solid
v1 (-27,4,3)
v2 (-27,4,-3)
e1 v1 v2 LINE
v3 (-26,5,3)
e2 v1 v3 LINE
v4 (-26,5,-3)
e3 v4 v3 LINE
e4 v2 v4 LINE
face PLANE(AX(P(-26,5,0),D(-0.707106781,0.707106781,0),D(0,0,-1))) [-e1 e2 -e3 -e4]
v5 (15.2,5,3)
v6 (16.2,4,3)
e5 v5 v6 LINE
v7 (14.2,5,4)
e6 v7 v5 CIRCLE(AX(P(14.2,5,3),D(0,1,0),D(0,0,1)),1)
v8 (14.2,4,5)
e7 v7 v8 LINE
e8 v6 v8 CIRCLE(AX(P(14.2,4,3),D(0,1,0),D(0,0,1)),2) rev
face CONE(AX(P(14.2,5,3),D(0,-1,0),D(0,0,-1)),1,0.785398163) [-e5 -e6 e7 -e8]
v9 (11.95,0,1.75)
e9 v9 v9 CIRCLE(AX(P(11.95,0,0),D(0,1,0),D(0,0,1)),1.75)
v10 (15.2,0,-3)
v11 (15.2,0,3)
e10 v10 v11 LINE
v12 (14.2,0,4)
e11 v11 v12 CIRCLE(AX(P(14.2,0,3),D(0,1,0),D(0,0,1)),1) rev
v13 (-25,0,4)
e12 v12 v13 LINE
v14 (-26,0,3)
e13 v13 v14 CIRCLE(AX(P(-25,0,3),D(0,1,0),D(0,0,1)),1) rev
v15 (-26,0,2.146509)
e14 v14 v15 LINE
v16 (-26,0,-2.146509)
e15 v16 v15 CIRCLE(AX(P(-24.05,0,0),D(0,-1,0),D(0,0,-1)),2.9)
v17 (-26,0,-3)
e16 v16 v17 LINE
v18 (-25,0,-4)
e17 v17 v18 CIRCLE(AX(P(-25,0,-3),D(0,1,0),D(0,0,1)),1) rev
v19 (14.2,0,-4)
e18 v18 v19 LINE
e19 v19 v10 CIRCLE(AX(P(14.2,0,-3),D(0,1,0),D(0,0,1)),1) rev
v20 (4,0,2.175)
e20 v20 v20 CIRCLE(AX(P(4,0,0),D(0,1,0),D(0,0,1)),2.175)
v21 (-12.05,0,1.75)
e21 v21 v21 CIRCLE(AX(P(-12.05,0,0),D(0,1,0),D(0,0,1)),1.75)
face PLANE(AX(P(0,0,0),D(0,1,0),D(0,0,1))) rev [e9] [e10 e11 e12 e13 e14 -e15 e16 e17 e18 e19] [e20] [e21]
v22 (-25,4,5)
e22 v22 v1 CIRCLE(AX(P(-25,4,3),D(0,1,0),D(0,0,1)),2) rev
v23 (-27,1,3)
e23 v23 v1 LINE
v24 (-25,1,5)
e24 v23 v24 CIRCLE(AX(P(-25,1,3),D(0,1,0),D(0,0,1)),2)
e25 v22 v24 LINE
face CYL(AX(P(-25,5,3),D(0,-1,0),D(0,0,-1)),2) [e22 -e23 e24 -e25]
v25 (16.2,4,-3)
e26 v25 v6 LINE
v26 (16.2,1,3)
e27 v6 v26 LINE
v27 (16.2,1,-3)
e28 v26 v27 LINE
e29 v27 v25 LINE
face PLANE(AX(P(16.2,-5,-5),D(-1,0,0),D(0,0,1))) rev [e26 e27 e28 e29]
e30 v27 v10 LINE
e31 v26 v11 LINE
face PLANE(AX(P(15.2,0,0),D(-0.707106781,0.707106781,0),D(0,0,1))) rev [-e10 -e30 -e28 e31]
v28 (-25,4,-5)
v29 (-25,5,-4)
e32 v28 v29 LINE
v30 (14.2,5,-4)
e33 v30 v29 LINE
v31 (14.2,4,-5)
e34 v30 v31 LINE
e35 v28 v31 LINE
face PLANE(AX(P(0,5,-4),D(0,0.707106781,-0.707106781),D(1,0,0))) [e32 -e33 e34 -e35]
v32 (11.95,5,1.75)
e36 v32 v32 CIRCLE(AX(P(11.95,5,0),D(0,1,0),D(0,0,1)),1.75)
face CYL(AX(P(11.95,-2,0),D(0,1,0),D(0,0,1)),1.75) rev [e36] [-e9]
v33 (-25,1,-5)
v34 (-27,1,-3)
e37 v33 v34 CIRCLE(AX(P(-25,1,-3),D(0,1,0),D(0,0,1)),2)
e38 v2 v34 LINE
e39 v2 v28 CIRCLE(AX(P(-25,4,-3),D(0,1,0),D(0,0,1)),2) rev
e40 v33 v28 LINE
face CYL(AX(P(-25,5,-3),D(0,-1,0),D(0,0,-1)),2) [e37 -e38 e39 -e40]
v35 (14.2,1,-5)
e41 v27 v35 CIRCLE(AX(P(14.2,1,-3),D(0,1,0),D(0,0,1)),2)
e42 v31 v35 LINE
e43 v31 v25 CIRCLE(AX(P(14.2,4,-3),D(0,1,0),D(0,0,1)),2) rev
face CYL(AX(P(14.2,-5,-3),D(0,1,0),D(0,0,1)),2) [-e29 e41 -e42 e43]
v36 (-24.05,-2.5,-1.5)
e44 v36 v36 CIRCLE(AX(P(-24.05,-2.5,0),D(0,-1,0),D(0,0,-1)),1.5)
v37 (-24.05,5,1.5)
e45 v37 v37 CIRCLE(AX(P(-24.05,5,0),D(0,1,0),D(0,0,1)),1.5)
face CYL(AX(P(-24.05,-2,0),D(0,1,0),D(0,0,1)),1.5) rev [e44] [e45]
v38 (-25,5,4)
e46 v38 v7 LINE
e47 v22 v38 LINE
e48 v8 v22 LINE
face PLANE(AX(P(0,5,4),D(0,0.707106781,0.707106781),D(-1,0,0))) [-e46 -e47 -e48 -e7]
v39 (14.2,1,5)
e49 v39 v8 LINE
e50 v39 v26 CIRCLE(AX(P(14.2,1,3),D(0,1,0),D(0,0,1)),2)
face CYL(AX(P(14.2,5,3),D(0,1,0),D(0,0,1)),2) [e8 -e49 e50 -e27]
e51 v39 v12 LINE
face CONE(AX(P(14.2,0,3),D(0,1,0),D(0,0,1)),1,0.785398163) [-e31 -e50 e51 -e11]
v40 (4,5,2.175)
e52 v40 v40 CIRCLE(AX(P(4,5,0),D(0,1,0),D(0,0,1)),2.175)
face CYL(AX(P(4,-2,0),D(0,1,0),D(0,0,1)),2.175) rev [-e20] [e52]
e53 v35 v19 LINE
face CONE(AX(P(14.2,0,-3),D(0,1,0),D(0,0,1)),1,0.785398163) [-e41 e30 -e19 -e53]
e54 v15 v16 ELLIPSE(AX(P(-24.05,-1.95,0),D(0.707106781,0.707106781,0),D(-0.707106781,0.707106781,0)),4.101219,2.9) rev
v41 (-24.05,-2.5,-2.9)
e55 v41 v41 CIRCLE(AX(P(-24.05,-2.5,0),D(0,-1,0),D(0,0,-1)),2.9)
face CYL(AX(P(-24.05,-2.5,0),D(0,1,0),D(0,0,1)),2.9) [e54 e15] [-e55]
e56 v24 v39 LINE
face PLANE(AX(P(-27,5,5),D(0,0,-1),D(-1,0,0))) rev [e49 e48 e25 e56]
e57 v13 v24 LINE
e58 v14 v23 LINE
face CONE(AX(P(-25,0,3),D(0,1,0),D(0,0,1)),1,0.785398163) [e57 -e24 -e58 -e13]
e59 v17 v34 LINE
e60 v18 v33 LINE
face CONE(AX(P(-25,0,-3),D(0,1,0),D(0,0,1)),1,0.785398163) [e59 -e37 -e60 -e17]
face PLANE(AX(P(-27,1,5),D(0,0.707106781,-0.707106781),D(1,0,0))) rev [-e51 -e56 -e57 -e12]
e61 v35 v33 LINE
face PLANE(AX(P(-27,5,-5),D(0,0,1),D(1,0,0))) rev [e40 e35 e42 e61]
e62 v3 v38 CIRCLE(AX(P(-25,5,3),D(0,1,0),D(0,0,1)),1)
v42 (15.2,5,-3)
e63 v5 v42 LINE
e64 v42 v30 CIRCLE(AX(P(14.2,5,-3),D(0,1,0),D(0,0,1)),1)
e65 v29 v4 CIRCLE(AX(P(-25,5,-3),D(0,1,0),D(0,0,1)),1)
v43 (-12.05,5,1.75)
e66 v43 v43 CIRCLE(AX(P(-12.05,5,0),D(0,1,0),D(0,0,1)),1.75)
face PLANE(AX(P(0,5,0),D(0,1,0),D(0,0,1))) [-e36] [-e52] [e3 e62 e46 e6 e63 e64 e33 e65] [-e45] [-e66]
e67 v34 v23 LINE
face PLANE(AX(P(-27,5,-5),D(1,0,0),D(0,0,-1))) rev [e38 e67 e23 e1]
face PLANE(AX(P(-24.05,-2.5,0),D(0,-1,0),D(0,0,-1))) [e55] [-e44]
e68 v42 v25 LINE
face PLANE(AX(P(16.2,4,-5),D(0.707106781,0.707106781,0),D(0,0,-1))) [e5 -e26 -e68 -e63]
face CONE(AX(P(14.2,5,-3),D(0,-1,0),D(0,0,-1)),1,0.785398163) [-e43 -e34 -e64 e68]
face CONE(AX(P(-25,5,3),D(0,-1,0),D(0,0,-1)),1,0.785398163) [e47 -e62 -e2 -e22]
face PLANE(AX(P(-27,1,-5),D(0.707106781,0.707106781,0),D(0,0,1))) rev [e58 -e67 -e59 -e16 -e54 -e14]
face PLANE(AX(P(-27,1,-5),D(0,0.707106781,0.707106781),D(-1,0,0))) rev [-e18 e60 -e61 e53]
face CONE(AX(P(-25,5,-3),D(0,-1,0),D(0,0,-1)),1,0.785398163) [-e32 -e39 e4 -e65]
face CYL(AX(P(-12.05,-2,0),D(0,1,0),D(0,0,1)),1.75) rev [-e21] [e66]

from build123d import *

# Parameters (mm, degrees)
SKETCH1_W           = 54
SKETCH1_H           = 10
BOSS_EXTRUDE1_DEPTH = 5
SKETCH3_R           = 1.5
SKETCH3_R_2         = 2.175
SKETCH3_R_3         = 1.75
CUT_EXTRUDE1_DEPTH  = 7
FILLET1_R           = 2
SKETCH4_R           = 2.9
SKETCH4_R_2         = 1.5
BOSS_EXTRUDE2_DEPTH = 2.5
SKETCH5_W           = 14.628032649
SKETCH5_H           = 11.072623212
CUT_EXTRUDE2_DEPTH  = 10
FILLET2_R           = 2
CHAMFER1_SIZE       = 1


with BuildPart() as part:
    # Sketch1 → Boss-Extrude1 (new body)
    with BuildSketch(Plane(origin=(0, 0, 0), x_dir=(1, 0, 0), z_dir=(0, 1, 0))):
        Rectangle(SKETCH1_W, SKETCH1_H)
    extrude(amount=BOSS_EXTRUDE1_DEPTH)

    # Sketch3 → Cut-Extrude1 (cut)
    with BuildSketch(Plane(origin=(0, 5, 0), x_dir=(1, 0, 0), z_dir=(0, 1, 0))):
        with Locations(Location((-24.05, 0, 0), (0, 0, 270))):
            Circle(SKETCH3_R)
        with Locations(Location((4, 0, 0), (0, 0, 270))):
            Circle(SKETCH3_R_2)
        with Locations(Location((-12.05, 0, 0), (0, 0, 270))):
            Circle(SKETCH3_R_3)
        with Locations(Location((11.95, 0, 0), (0, 0, 270))):
            Circle(SKETCH3_R_3)
    extrude(amount=-CUT_EXTRUDE1_DEPTH, mode=Mode.SUBTRACT)

    # Fillet1
    fillet1_edges = [part.edges().sort_by_distance(p)[0] for p in [
        (27, 2.5, 5),
        (-27, 2.5, 5),
        (-27, 2.5, -5),
        (27, 2.5, -5),
    ]]
    fillet(fillet1_edges, radius=FILLET1_R)

    # Sketch4 → Boss-Extrude2 (add)
    with BuildSketch(Plane.XZ):
        with Locations(Location((-24.05, 0, 0), (0, 0, 270))):
            Circle(SKETCH4_R)
        with Locations(Location((-24.05, 0, 0), (0, 0, 90))):
            Circle(SKETCH4_R_2, mode=Mode.SUBTRACT)
    extrude(amount=BOSS_EXTRUDE2_DEPTH)

    # Sketch5 → Cut-Extrude2 (cut)
    with BuildSketch(Plane(origin=(0, 5, 0), x_dir=(1, 0, 0), z_dir=(0, 1, 0))):
        with Locations((23.514016324, -0.536311606)):
            Rectangle(SKETCH5_W, SKETCH5_H)
    extrude(amount=-CUT_EXTRUDE2_DEPTH, mode=Mode.SUBTRACT)

    # Fillet2
    fillet2_edges = [part.edges().sort_by_distance(p)[0] for p in [
        (16.2, 2.5, 5),
        (16.2, 2.5, -5),
    ]]
    fillet(fillet2_edges, radius=FILLET2_R)

    # Chamfer1
    # the kernel refuses this chamfer: 1 mm, written as the material it takes off along each edge
    with BuildSketch(Plane(origin=(14.2, 0, -3), x_dir=(0, 0, -1), z_dir=(-1, 0, 0))) as chamfer1_piece_1:
        Polygon((2 - CHAMFER1_SIZE, 0), (2, -CHAMFER1_SIZE), (2, 0), align=None)
    revolve(axis=Axis((14.2, 0, -3), (0, -1, 0)), revolution_arc=90, mode=Mode.SUBTRACT)
    with BuildSketch(Plane(origin=(14.2, 0, 5), x_dir=(0, -0.027495876610586365, -0.9996219169112968), z_dir=(-1, 0, 0)), Plane(origin=(-25, 5, -5), x_dir=(0, -0.9996219169112968, -0.027495876610586487), z_dir=(1, 0, 0))) as chamfer1_piece_2:
        Polygon((CHAMFER1_SIZE * 0.999621916911, -CHAMFER1_SIZE * 0.0274958766106), (-CHAMFER1_SIZE * 0.0274958766106, -CHAMFER1_SIZE * 0.999621916911), (0, 0), align=None)
    extrude(amount=39.2, mode=Mode.SUBTRACT)
    with BuildSketch(Plane(origin=(-27, 0, 3), x_dir=(0.9996219169112968, -0.02749587661058639, 0), z_dir=(0, 0, -1))) as chamfer1_piece_3_section:
        Polygon((CHAMFER1_SIZE * 0.999621916911, -CHAMFER1_SIZE * 0.0274958766106), (-CHAMFER1_SIZE * 0.0274958766106, -CHAMFER1_SIZE * 0.999621916911), (0, 0), align=None)
    chamfer1_piece_3 = extrude(amount=6, mode=Mode.PRIVATE)
    chamfer1_piece_3 = chamfer1_piece_3 - Plane(origin=(-24.05, 0.490897833, 0), x_dir=(0, 0, -1), z_dir=(0, 1, 0)) * Cylinder(2.9, 16, mode=Mode.PRIVATE)
    add(chamfer1_piece_3, mode=Mode.SUBTRACT)
    with BuildSketch(Plane(origin=(-25, 0, 3), x_dir=(-1, 0, 0), z_dir=(0, 0, -1))) as chamfer1_piece_4:
        Polygon((2 - CHAMFER1_SIZE, 0), (2, CHAMFER1_SIZE), (2, 0), align=None)
    revolve(axis=Axis((-25, 0, 3), (0, 1, 0)), revolution_arc=90, mode=Mode.SUBTRACT)
    with BuildSketch(Plane(origin=(-25, 0, -3), x_dir=(0, 0, -1), z_dir=(1, 0, 0))) as chamfer1_piece_5:
        Polygon((2 - CHAMFER1_SIZE, 0), (2, CHAMFER1_SIZE), (2, 0), align=None)
    revolve(axis=Axis((-25, 0, -3), (0, 1, 0)), revolution_arc=90, mode=Mode.SUBTRACT)
    with BuildSketch(Plane(origin=(-27, 5, 3), x_dir=(0.9996219169112968, 0.02749587661058651, 0), z_dir=(0, 0, -1))) as chamfer1_piece_6:
        Polygon((CHAMFER1_SIZE * 0.999621916911, CHAMFER1_SIZE * 0.0274958766106), (-CHAMFER1_SIZE * 0.0274958766106, CHAMFER1_SIZE * 0.999621916911), (0, 0), align=None)
    extrude(amount=6, mode=Mode.SUBTRACT)
    with BuildSketch(Plane(origin=(14.2, 5, 5), x_dir=(0, 0.027495876610586487, -0.9996219169112968), z_dir=(-1, 0, 0)), Plane(origin=(-25, 0, -5), x_dir=(0, 0.9996219169112968, -0.027495876610586494), z_dir=(1, 0, 0))) as chamfer1_piece_7:
        Polygon((CHAMFER1_SIZE * 0.999621916911, CHAMFER1_SIZE * 0.0274958766106), (-CHAMFER1_SIZE * 0.0274958766106, CHAMFER1_SIZE * 0.999621916911), (0, 0), align=None)
    extrude(amount=39.2, mode=Mode.SUBTRACT)
    with BuildSketch(Plane(origin=(-25, 5, 3), x_dir=(-1, 0, 0), z_dir=(0, 0, -1))) as chamfer1_piece_8:
        Polygon((2 - CHAMFER1_SIZE, 0), (2, -CHAMFER1_SIZE), (2, 0), align=None)
    revolve(axis=Axis((-25, 5, 3), (0, 1, 0)), revolution_arc=90, mode=Mode.SUBTRACT)
    with BuildSketch(Plane(origin=(-25, 5, -3), x_dir=(0, 0, -1), z_dir=(1, 0, 0))) as chamfer1_piece_9:
        Polygon((2, -CHAMFER1_SIZE), (2 - CHAMFER1_SIZE, 0), (2, 0), align=None)
    revolve(axis=Axis((-25, 5, -3), (0, 1, 0)), revolution_arc=90, mode=Mode.SUBTRACT)
    with BuildSketch(Plane(origin=(16.2, 0, -3), x_dir=(-0.9996219169112968, -0.02749587661058639, 0), z_dir=(0, 0, 1)), Plane(origin=(16.2, 5, 3), x_dir=(-0.9996219169112968, 0.02749587661058651, 0), z_dir=(0, 0, -1))) as chamfer1_piece_10:
        Polygon((CHAMFER1_SIZE * 0.999621916911, -CHAMFER1_SIZE * 0.0274958766106), (-CHAMFER1_SIZE * 0.0274958766106, -CHAMFER1_SIZE * 0.999621916911), (0, 0), align=None)
    extrude(amount=6, mode=Mode.SUBTRACT)
    with BuildSketch(Plane(origin=(14.2, 5, 3), x_dir=(1, 0, 0), z_dir=(0, 0, -1))) as chamfer1_piece_11:
        Polygon((2 - CHAMFER1_SIZE, 0), (2, CHAMFER1_SIZE), (2, 0), align=None)
    revolve(axis=Axis((14.2, 5, 3), (0, -1, 0)), revolution_arc=90, mode=Mode.SUBTRACT)
    with BuildSketch(Plane(origin=(14.2, 5, -3), x_dir=(0, 0, -1), z_dir=(-1, 0, 0))) as chamfer1_piece_12:
        Polygon((2, CHAMFER1_SIZE), (2 - CHAMFER1_SIZE, 0), (2, 0), align=None)
    revolve(axis=Axis((14.2, 5, -3), (0, -1, 0)), revolution_arc=90, mode=Mode.SUBTRACT)
    with BuildSketch(Plane(origin=(14.2, 0, 3), x_dir=(1, 0, 0), z_dir=(0, 0, -1))) as chamfer1_piece_13:
        Polygon((2 - CHAMFER1_SIZE, 0), (2, -CHAMFER1_SIZE), (2, 0), align=None)
    revolve(axis=Axis((14.2, 0, 3), (0, -1, 0)), revolution_arc=90, mode=Mode.SUBTRACT)


solid = part.part
